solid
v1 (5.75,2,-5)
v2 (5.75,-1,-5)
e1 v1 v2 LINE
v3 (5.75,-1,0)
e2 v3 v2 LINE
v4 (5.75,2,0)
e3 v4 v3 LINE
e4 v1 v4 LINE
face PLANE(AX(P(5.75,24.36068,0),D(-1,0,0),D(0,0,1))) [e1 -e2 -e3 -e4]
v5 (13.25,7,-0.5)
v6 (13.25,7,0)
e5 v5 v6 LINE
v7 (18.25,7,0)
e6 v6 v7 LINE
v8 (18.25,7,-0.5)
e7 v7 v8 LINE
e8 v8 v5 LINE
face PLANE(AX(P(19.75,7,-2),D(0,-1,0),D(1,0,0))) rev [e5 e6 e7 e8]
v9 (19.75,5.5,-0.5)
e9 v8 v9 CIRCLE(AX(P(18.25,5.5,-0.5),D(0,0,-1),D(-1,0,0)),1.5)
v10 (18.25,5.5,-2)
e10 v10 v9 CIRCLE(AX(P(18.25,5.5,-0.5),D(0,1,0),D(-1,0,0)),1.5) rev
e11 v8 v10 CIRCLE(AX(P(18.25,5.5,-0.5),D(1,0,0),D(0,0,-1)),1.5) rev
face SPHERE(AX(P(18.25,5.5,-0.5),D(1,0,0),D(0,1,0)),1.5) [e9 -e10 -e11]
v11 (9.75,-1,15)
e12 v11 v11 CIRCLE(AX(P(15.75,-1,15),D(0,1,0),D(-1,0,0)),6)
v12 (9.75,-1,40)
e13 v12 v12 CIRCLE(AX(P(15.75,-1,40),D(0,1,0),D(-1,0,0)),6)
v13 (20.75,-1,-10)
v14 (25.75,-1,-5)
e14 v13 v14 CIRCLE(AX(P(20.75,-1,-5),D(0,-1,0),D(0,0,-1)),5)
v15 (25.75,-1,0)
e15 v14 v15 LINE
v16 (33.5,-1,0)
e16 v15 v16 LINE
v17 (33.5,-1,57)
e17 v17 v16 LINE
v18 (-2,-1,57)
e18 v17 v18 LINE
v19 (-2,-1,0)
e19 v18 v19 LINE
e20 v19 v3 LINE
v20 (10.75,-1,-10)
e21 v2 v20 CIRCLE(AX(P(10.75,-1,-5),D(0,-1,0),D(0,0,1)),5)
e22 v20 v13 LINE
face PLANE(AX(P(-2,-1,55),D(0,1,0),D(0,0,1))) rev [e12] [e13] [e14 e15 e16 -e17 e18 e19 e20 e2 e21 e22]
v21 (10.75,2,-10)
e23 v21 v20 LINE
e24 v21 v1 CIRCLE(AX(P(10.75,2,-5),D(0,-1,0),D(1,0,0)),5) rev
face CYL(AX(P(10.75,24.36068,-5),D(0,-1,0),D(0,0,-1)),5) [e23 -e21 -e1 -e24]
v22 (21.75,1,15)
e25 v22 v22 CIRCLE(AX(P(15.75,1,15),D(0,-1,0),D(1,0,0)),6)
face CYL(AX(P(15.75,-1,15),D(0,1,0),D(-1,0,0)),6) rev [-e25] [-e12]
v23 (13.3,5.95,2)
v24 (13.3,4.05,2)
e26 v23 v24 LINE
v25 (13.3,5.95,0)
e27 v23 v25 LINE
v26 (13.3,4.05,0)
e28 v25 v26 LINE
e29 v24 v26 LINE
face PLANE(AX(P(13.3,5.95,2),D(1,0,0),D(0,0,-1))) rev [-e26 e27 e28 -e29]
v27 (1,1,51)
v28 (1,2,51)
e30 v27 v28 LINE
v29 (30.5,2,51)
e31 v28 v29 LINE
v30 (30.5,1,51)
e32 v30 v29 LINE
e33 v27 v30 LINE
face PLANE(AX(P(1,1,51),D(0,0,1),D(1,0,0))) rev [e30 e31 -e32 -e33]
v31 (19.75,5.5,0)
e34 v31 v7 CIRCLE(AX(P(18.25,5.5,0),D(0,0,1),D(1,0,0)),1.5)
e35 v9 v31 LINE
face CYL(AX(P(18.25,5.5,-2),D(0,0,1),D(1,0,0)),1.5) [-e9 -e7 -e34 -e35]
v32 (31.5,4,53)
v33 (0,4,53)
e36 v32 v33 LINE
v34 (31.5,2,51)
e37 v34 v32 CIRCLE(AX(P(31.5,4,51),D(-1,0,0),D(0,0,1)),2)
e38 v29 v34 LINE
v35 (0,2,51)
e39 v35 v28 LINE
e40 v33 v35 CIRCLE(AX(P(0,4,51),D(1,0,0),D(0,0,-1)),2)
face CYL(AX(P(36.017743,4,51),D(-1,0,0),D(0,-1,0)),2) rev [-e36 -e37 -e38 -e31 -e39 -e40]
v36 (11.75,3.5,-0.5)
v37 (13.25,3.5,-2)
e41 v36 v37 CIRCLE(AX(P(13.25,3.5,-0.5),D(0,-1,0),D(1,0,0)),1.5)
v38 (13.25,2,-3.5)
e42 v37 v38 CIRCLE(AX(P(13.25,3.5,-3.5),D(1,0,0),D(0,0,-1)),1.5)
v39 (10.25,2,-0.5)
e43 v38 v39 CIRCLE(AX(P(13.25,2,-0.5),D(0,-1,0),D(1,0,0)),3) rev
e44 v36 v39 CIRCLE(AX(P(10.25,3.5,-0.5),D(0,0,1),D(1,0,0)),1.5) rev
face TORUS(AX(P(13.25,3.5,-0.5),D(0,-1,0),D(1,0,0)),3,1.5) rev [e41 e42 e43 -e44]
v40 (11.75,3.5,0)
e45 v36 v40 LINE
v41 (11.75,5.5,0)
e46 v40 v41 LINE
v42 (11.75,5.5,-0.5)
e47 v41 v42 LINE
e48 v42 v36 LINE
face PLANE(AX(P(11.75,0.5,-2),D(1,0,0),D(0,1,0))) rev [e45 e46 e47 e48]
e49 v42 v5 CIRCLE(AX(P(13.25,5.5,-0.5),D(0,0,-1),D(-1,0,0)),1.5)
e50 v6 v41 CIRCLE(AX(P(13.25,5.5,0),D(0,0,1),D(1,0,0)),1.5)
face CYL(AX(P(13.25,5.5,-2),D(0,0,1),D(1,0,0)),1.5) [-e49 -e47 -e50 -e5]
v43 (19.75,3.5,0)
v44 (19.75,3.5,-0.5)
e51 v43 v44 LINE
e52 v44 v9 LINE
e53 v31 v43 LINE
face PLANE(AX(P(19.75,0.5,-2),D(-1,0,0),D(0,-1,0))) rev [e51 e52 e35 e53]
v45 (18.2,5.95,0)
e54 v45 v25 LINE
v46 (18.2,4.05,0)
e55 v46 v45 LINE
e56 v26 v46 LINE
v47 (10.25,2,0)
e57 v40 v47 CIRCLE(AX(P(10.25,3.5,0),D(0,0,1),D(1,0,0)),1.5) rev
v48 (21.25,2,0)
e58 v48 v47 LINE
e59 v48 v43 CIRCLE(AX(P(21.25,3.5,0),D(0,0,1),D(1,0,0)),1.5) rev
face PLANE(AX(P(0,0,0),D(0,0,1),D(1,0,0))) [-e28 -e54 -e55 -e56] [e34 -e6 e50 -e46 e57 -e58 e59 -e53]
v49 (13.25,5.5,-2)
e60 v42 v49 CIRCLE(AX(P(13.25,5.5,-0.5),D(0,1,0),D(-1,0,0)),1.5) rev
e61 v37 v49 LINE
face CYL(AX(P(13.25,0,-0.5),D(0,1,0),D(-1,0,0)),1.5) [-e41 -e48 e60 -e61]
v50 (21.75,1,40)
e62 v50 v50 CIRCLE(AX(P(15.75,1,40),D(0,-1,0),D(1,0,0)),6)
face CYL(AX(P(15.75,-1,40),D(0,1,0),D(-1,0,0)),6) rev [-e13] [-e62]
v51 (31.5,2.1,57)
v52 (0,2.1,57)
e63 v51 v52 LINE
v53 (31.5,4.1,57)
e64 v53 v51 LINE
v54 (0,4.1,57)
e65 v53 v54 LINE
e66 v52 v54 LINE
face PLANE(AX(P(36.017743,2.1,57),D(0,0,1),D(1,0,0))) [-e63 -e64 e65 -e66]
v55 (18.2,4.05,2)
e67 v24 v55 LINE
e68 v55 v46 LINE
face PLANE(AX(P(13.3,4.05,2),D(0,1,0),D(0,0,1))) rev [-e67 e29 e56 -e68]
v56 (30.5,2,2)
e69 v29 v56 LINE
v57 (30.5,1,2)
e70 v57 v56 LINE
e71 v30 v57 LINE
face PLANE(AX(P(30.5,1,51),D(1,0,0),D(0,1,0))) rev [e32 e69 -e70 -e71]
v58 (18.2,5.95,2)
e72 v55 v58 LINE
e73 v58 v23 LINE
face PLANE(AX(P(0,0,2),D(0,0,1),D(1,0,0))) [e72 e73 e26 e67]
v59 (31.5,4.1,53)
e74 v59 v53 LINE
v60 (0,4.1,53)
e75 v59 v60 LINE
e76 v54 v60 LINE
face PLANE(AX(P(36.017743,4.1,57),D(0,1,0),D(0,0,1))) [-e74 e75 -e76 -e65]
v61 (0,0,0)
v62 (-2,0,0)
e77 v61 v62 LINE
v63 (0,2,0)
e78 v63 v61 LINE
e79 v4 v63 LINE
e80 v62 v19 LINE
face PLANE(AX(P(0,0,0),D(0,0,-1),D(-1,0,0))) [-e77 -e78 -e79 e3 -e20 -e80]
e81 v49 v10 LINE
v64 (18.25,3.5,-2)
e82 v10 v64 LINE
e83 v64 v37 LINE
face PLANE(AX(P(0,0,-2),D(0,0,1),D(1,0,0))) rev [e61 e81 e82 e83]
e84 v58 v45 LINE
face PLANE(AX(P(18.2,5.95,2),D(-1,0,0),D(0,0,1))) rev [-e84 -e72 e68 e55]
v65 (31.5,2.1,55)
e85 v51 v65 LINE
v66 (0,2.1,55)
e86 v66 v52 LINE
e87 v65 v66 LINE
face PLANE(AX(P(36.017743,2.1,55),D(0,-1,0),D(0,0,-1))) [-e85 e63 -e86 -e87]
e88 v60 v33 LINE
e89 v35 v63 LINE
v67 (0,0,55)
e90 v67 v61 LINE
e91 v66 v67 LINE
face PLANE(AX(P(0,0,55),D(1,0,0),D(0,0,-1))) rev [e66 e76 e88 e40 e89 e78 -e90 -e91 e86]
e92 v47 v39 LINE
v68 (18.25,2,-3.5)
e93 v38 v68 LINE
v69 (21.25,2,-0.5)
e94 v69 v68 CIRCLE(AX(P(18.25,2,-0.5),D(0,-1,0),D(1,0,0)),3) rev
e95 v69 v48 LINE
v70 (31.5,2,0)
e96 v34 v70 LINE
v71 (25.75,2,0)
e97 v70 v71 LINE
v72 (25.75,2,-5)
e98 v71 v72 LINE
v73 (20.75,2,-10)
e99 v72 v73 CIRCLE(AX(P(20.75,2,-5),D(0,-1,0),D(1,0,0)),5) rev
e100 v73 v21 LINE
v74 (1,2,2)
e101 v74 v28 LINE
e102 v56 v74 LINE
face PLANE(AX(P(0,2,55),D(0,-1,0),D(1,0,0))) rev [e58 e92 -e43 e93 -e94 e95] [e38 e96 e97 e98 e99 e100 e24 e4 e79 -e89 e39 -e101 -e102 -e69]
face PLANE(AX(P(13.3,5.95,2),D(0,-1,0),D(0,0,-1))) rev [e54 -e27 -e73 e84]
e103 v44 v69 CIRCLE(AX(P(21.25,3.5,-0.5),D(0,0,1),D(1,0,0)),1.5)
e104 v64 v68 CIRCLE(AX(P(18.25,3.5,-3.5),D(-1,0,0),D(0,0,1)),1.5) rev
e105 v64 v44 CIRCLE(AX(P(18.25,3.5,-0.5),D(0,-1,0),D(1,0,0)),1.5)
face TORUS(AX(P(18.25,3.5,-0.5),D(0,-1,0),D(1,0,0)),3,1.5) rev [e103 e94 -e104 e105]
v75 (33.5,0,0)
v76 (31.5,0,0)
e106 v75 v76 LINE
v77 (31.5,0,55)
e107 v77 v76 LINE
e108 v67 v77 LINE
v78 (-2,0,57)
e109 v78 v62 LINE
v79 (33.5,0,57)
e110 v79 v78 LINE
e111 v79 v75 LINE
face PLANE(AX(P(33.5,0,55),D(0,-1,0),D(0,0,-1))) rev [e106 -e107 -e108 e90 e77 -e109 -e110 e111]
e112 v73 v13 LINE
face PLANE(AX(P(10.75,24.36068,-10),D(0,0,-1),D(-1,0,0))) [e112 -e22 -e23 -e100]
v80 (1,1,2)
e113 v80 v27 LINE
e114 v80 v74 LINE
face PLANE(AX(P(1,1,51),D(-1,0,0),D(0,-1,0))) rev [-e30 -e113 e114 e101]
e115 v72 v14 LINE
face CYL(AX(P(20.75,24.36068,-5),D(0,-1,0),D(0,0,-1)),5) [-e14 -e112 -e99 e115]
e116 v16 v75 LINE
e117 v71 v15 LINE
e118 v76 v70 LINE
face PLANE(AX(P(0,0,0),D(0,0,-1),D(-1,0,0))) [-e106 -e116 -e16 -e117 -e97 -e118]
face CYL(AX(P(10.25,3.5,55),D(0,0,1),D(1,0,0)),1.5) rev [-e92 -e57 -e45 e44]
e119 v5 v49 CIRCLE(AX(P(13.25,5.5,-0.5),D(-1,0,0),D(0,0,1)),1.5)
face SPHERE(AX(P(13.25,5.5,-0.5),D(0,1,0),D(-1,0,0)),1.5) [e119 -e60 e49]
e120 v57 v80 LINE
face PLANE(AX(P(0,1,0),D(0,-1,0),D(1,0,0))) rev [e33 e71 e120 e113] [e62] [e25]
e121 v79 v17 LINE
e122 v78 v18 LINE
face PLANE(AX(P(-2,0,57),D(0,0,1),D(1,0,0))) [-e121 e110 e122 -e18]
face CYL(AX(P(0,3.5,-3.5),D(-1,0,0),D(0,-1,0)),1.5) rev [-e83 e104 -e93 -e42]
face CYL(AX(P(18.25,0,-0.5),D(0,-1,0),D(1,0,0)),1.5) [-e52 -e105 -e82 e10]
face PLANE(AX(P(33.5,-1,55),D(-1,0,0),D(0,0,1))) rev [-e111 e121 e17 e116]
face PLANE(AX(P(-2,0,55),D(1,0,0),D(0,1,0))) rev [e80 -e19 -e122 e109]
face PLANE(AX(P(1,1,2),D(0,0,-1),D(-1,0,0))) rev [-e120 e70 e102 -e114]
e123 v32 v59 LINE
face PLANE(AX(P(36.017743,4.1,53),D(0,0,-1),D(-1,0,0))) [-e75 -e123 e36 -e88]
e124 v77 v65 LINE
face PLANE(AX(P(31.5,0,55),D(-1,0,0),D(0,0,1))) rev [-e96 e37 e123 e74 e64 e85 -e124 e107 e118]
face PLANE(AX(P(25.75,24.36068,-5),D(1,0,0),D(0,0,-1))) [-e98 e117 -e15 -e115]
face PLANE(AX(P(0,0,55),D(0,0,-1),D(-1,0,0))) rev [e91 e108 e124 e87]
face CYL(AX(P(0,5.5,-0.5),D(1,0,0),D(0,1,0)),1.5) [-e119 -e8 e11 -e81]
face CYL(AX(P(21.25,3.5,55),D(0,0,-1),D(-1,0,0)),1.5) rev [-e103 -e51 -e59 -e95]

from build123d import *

# Parameters (mm, degrees)
BOSS_EXTRU_1_DEPTH      = 55
ESQUISSE2_W             = 35.5
ESQUISSE2_H             = 2
BOSS_EXTRU_2_DEPTH      = 1
BOSS_EXTRU_3_DEPTH      = 31.5
ESQUISSE4_W             = 8
ESQUISSE4_H             = 6.5
BOSS_EXTRU_4_DEPTH      = 2
ESQUISSE5_W             = 4.9
ESQUISSE5_H             = 1.9
BOSS_EXTRU_5_DEPTH      = 2
BOSS_EXTRU_6_DEPTH      = 3
ESQUISSE8_W             = 29.5
ESQUISSE8_H             = 49
ENL_V_MAT_EXTRU_2_DEPTH = 1
CONG_1_R                = 2
CONG_4_R                = 1.5
ESQUISSE7_R             = 6
ENL_V_MAT_EXTRU_1_DEPTH = 67.304223093


with BuildPart() as part:
    # Esquisse1 → Boss.-Extru.1 (new body)
    with BuildSketch(Plane.XY):
        Polygon((0, 0), (-2, 0), (-2, -1), (33.5, -1), (33.5, 0), (31.5, 0), (31.5, 2), (0, 2), align=None)
    extrude(amount=BOSS_EXTRU_1_DEPTH)

    # Esquisse2 → Boss.-Extru.2 (add)
    with BuildSketch(Plane.XZ.offset(1)):
        with Locations((15.75, 56)):
            Rectangle(ESQUISSE2_W, ESQUISSE2_H)
    extrude(amount=-BOSS_EXTRU_2_DEPTH)

    # Esquisse3 → Boss.-Extru.3 (add)
    with BuildSketch(Plane.ZY):
        Polygon((55, 2), (55, 2.1), (57, 2.1), (57, 4.1), (53, 4.1), (53, 2), align=None)
    extrude(amount=-BOSS_EXTRU_3_DEPTH)

    # Esquisse4 → Boss.-Extru.4 (add)
    with BuildSketch(Plane(origin=(0, 0, 0), x_dir=(-1, 0, 0), z_dir=(0, 0, -1))):
        with Locations((-15.75, 3.75)):
            Rectangle(ESQUISSE4_W, ESQUISSE4_H)
    extrude(amount=BOSS_EXTRU_4_DEPTH)

    # Esquisse5 → Boss.-Extru.5 (add)
    with BuildSketch(Plane.XY):
        with Locations((15.75, 5)):
            Rectangle(ESQUISSE5_W, ESQUISSE5_H)
    extrude(amount=BOSS_EXTRU_5_DEPTH)

    # Esquisse6 → Boss.-Extru.6 (add)
    with BuildSketch(Plane.XZ.offset(1)):
        with BuildLine():
            Line((5.75, 0), (5.75, -5))
            ThreePointArc((5.75, -5), (7.214466094, -8.535533906), (10.75, -10))
            Line((10.75, -10), (20.75, -10))
            ThreePointArc((20.75, -10), (24.285533906, -8.535533906), (25.75, -5))
            Line((25.75, -5), (25.75, 0))
            Line((25.75, 0), (5.75, 0))
        make_face()
    extrude(amount=-BOSS_EXTRU_6_DEPTH)

    # Esquisse8 → Enlèv. mat.-Extru.2 (cut)
    with BuildSketch(Plane(origin=(0, 2, 0), x_dir=(1, 0, 0), z_dir=(0, 1, 0))):
        with Locations((15.75, -26.5)):
            Rectangle(ESQUISSE8_W, ESQUISSE8_H)
    extrude(amount=-ENL_V_MAT_EXTRU_2_DEPTH, mode=Mode.SUBTRACT)

    # Congé1
    cong_1_edges = [part.edges().sort_by_distance(p)[0] for p in [
        (15.75, 2, 53),
    ]]
    fillet(cong_1_edges, radius=CONG_1_R - 0.0001)  # a hair under: the kernel refuses the full size

    # Congé4
    cong_4_edges = [part.edges().sort_by_distance(p)[0] for p in [
        (11.75, 7, -1),
        (19.75, 7, -1),
        (15.75, 7, -2),
        (19.75, 4.5, -2),
        (11.75, 4.5, -2),
        (15.75, 2, -2),
        (11.75, 2, -1),
        (19.75, 2, -1),
    ]]
    fillet(cong_4_edges, radius=CONG_4_R)

    # Esquisse7 → Enlèv. mat.-Extru.1 (cut, through all)
    with BuildSketch(Plane(origin=(0, 2, 0), x_dir=(1, 0, 0), z_dir=(0, 1, 0))):
        with Locations(Location((15.75, -15, 0), (0, 0, 180))):
            Circle(ESQUISSE7_R)
        with Locations(Location((15.75, -40, 0), (0, 0, 180))):
            Circle(ESQUISSE7_R)
    extrude(amount=-ENL_V_MAT_EXTRU_1_DEPTH, mode=Mode.SUBTRACT)


solid = part.part
